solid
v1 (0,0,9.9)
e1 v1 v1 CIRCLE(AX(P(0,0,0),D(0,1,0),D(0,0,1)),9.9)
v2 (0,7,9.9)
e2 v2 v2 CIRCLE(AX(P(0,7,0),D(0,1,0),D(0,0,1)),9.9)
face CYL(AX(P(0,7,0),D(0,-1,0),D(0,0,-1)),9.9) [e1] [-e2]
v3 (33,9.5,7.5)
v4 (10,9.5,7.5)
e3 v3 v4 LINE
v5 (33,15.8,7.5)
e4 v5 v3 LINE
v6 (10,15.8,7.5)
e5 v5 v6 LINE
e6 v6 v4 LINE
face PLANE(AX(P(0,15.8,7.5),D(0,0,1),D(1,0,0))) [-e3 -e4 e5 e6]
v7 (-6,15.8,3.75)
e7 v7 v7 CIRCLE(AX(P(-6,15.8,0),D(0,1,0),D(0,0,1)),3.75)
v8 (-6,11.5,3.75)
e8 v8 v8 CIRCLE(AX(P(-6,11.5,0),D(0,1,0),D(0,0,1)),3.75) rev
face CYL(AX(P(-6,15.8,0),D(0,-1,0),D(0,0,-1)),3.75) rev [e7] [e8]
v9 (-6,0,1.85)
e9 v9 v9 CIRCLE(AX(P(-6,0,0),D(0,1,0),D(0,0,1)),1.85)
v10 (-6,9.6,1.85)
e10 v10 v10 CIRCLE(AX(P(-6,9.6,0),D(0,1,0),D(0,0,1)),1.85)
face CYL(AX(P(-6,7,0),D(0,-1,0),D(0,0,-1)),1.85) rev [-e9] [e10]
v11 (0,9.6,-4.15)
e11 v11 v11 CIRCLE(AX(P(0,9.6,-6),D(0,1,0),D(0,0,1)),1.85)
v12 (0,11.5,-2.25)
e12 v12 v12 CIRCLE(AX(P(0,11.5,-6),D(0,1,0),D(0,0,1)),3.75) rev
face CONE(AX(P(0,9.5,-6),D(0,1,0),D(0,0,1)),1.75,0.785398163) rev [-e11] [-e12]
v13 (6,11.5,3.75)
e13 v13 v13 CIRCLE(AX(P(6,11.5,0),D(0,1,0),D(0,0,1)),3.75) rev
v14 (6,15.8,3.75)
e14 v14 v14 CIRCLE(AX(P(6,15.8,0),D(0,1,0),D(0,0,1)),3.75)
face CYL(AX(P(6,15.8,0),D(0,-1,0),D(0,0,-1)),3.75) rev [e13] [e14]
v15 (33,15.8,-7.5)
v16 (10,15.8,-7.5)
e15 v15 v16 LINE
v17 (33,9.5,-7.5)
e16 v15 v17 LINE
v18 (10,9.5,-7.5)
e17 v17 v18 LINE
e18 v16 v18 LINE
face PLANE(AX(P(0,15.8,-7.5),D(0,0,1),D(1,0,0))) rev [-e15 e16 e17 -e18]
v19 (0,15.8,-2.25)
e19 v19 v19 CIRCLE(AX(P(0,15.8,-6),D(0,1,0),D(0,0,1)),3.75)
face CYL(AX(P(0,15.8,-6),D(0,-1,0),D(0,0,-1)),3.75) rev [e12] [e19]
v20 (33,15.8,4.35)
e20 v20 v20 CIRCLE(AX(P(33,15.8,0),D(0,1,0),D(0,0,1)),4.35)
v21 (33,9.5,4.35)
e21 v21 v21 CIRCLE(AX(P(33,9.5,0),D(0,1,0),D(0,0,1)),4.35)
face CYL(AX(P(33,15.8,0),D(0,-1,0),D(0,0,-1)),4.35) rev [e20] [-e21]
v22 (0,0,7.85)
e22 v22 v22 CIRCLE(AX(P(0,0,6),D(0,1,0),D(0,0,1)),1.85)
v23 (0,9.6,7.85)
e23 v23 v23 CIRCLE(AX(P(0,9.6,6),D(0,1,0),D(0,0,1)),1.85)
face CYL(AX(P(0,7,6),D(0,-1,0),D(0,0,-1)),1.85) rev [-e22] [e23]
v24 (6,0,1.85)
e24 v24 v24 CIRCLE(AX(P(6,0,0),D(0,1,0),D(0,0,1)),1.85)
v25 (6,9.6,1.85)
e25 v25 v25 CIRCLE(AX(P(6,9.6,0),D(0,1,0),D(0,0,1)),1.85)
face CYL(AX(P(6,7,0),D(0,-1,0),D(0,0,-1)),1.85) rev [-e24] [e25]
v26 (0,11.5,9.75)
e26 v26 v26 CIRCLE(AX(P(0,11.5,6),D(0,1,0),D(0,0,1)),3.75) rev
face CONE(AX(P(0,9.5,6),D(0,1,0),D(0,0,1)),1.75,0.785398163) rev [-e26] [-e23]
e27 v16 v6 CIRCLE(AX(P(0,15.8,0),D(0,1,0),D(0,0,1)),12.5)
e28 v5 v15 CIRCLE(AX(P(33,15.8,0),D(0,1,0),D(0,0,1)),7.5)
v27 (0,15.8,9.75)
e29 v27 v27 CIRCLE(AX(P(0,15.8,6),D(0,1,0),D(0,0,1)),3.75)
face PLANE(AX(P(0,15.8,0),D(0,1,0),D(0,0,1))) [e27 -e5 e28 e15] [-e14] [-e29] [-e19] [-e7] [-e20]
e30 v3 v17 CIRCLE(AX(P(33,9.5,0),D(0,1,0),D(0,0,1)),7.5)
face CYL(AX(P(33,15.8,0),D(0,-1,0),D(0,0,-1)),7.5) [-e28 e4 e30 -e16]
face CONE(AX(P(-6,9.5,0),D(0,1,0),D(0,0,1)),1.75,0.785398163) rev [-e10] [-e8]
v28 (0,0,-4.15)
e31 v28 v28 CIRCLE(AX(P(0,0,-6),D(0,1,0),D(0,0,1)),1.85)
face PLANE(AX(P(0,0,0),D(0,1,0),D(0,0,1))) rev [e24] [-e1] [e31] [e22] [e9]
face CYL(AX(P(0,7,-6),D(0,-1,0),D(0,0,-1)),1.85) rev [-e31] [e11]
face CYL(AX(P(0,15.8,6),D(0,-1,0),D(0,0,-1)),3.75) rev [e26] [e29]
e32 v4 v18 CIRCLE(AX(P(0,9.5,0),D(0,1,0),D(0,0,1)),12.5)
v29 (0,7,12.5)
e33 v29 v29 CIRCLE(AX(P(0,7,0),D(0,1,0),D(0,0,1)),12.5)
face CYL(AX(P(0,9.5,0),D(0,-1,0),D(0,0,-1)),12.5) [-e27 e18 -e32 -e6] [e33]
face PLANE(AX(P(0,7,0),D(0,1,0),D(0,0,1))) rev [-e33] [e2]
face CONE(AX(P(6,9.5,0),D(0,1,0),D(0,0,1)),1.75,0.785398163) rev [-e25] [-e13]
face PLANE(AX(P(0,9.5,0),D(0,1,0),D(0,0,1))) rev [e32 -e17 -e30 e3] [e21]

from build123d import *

# Parameters (mm, degrees)
SKETCH_1_R      = 9.9
SKETCH_1_R_2    = 1.85
EXTRUDE_1_DEPTH = 7
SKETCH_2_R      = 12.5
SKETCH_2_R_2    = 1.85
EXTRUDE_2_DEPTH = 2.5
SKETCH_3_R      = 3.75
EXTRUDE_3_DEPTH = 6.3
CHAMFER_1_SIZE  = 2


with BuildPart() as part:
    # 草图1 → 凸台-拉伸1 (new body)
    with BuildSketch(Plane(origin=(0, 0, 0), x_dir=(1, 0, 0), z_dir=(0, 1, 0))):
        with Locations(Location((0, 0, 0), (0, 0, 270))):
            Circle(SKETCH_1_R)
        with Locations(Location((6, 0, 0), (0, 0, 270))):
            Circle(SKETCH_1_R_2, mode=Mode.SUBTRACT)
        with Locations(Location((0, -6, 0), (0, 0, 270))):
            Circle(SKETCH_1_R_2, mode=Mode.SUBTRACT)
        with Locations(Location((-6, 0, 0), (0, 0, 270))):
            Circle(SKETCH_1_R_2, mode=Mode.SUBTRACT)
        with Locations(Location((0, 6, 0), (0, 0, 270))):
            Circle(SKETCH_1_R_2, mode=Mode.SUBTRACT)
    extrude(amount=EXTRUDE_1_DEPTH)

    # 草图2 → 凸台-拉伸2 (add)
    with BuildSketch(Plane(origin=(0, 7, 0), x_dir=(1, 0, 0), z_dir=(0, 1, 0))):
        with Locations(Location((0, 0, 0), (0, 0, 270))):
            Circle(SKETCH_2_R)
        with Locations(Location((-6, 0, 0), (0, 0, 270))):
            Circle(SKETCH_2_R_2, mode=Mode.SUBTRACT)
        with Locations(Location((0, -6, 0), (0, 0, 270))):
            Circle(SKETCH_2_R_2, mode=Mode.SUBTRACT)
        with Locations(Location((6, 0, 0), (0, 0, 270))):
            Circle(SKETCH_2_R_2, mode=Mode.SUBTRACT)
        with Locations(Location((0, 6, 0), (0, 0, 270))):
            Circle(SKETCH_2_R_2, mode=Mode.SUBTRACT)
    extrude(amount=EXTRUDE_2_DEPTH)

    # 草图3 → 凸台-拉伸3 (add)
    # profile 1 of 8: a face of its own
    with BuildSketch(Plane(origin=(0, 9.5, 0), x_dir=(1, 0, 0), z_dir=(0, 1, 0))):
        with BuildLine():
            Line((2.25, 0), (-2.25, 0))
            ThreePointArc((-2.25, 0), (-6, -3.75), (-9.75, 0))
            Line((-9.75, 0), (-12.5, 0))
            ThreePointArc((-12.5, 0), (-3.952847075, -11.858541226), (10, -7.5))
            ThreePointArc((10, -7.5), (11.858541226, -3.952847075), (12.5, 0))
            Line((12.5, 0), (9.75, 0))
            ThreePointArc((9.75, 0), (6, -3.75), (2.25, 0))
        make_face()
        with Locations(Location((0, -6, 0), (0, 0, 270))):
            Circle(SKETCH_3_R, mode=Mode.SUBTRACT)
    # profile 2 of 8: a face of its own
    with BuildSketch(Plane(origin=(0, 9.5, 0), x_dir=(1, 0, 0), z_dir=(0, 1, 0))):
        with BuildLine():
            ThreePointArc((-9.75, 0), (-6, 3.75), (-2.25, 0))
            Line((-2.25, 0), (2.25, 0))
            ThreePointArc((2.25, 0), (6, 3.75), (9.75, 0))
            Line((9.75, 0), (12.5, 0))
            ThreePointArc((12.5, 0), (11.858541226, 3.952847075), (10, 7.5))
            ThreePointArc((10, 7.5), (-3.952847075, 11.858541226), (-12.5, 0))
            Line((-12.5, 0), (-9.75, 0))
        make_face()
        with Locations(Location((0, 6, 0), (0, 0, 270))):
            Circle(SKETCH_3_R, mode=Mode.SUBTRACT)
    # profile 3 of 8: a face of its own
    with BuildSketch(Plane(origin=(0, 9.5, 0), x_dir=(1, 0, 0), z_dir=(0, 1, 0))):
        with BuildLine():
            ThreePointArc((10, 7.5), (11.858541226, 3.952847075), (12.5, 0))
            Line((12.5, 0), (25.5, 0))
            ThreePointArc((25.5, 0), (27.696699141, 5.303300859), (33, 7.5))
            Line((33, 7.5), (10, 7.5))
        make_face()
    # profile 4 of 8: a face of its own
    with BuildSketch(Plane(origin=(0, 9.5, 0), x_dir=(1, 0, 0), z_dir=(0, 1, 0))):
        with BuildLine():
            Line((25.5, 0), (12.5, 0))
            ThreePointArc((12.5, 0), (11.858541226, -3.952847075), (10, -7.5))
            Line((10, -7.5), (33, -7.5))
            ThreePointArc((33, -7.5), (27.696699141, -5.303300859), (25.5, 0))
        make_face()
    # profile 5 of 8: a face of its own
    with BuildSketch(Plane(origin=(0, 9.5, 0), x_dir=(1, 0, 0), z_dir=(0, 1, 0))):
        with BuildLine():
            ThreePointArc((33, 7.5), (27.696699141, 5.303300859), (25.5, 0))
            Line((25.5, 0), (28.65, 0))
            ThreePointArc((28.65, 0), (33, 4.35), (37.35, 0))
            Line((37.35, 0), (40.5, 0))
            ThreePointArc((40.5, 0), (38.303300859, 5.303300859), (33, 7.5))
        make_face()
    # profile 6 of 8: a face of its own
    with BuildSketch(Plane(origin=(0, 9.5, 0), x_dir=(1, 0, 0), z_dir=(0, 1, 0))):
        with BuildLine():
            Line((28.65, 0), (25.5, 0))
            ThreePointArc((25.5, 0), (27.696699141, -5.303300859), (33, -7.5))
            ThreePointArc((33, -7.5), (38.303300859, -5.303300859), (40.5, 0))
            Line((40.5, 0), (37.35, 0))
            ThreePointArc((37.35, 0), (33, -4.35), (28.65, 0))
        make_face()
    # profile 7 of 8: a face of its own
    with BuildSketch(Plane(origin=(0, 9.5, 0), x_dir=(1, 0, 0), z_dir=(0, 1, 0))):
        with BuildLine():
            ThreePointArc((33, 7.5), (27.696699141, 5.303300859), (25.5, 0))
            Line((25.5, 0), (28.65, 0))
            ThreePointArc((28.65, 0), (33, 4.35), (37.35, 0))
            Line((37.35, 0), (40.5, 0))
            ThreePointArc((40.5, 0), (38.303300859, 5.303300859), (33, 7.5))
        make_face()
    # profile 8 of 8: a face of its own
    with BuildSketch(Plane(origin=(0, 9.5, 0), x_dir=(1, 0, 0), z_dir=(0, 1, 0))):
        with BuildLine():
            Line((28.65, 0), (25.5, 0))
            ThreePointArc((25.5, 0), (27.696699141, -5.303300859), (33, -7.5))
            ThreePointArc((33, -7.5), (38.303300859, -5.303300859), (40.5, 0))
            Line((40.5, 0), (37.35, 0))
            ThreePointArc((37.35, 0), (33, -4.35), (28.65, 0))
        make_face()
    extrude(amount=EXTRUDE_3_DEPTH)

    # 倒角1
    # the kernel refuses this chamfer: 2 mm, written as the material it adds along each edge
    with BuildSketch(Plane(origin=(0, 9.5, 6), x_dir=(0, 0, 1), z_dir=(-1, 0, 0))) as chamfer_1_piece_1_section:
        Polygon((3.75 - CHAMFER_1_SIZE, 0), (3.75, CHAMFER_1_SIZE), (3.75, 0), align=None)
    chamfer_1_piece_1 = revolve(axis=Axis((0, 9.5, 6), (0, 1, 0)), mode=Mode.PRIVATE)
    chamfer_1_piece_1 = chamfer_1_piece_1 - Plane(origin=(0, 10.553600351, 6), x_dir=(0, 0, 1), z_dir=(0, -1, 0)) * Cylinder(1.85, 15, mode=Mode.PRIVATE)
    add(chamfer_1_piece_1)
    with BuildSketch(Plane(origin=(-6, 9.5, 0), x_dir=(-1, 0, 0), z_dir=(0, 0, 1))) as chamfer_1_piece_2_section:
        Polygon((3.75 - CHAMFER_1_SIZE, 0), (3.75, -CHAMFER_1_SIZE), (3.75, 0), align=None)
    chamfer_1_piece_2 = revolve(axis=Axis((-6, 9.5, 0), (0, -1, 0)), mode=Mode.PRIVATE)
    chamfer_1_piece_2 = chamfer_1_piece_2 - Plane(origin=(-6, 10.553600351, 0), x_dir=(0, 0, 1), z_dir=(0, -1, 0)) * Cylinder(1.85, 15, mode=Mode.PRIVATE)
    add(chamfer_1_piece_2)
    with BuildSketch(Plane(origin=(0, 9.5, -6), x_dir=(0, 0, 1), z_dir=(-1, 0, 0))) as chamfer_1_piece_3_section:
        Polygon((3.75 - CHAMFER_1_SIZE, 0), (3.75, CHAMFER_1_SIZE), (3.75, 0), align=None)
    chamfer_1_piece_3 = revolve(axis=Axis((0, 9.5, -6), (0, 1, 0)), mode=Mode.PRIVATE)
    chamfer_1_piece_3 = chamfer_1_piece_3 - Plane(origin=(0, 10.553600351, -6), x_dir=(0, 0, 1), z_dir=(0, -1, 0)) * Cylinder(1.85, 16, mode=Mode.PRIVATE)
    add(chamfer_1_piece_3)
    with BuildSketch(Plane(origin=(6, 9.5, 0), x_dir=(1, 0, 0), z_dir=(0, 0, -1))) as chamfer_1_piece_4_section:
        Polygon((3.75 - CHAMFER_1_SIZE, 0), (3.75, -CHAMFER_1_SIZE), (3.75, 0), align=None)
    chamfer_1_piece_4 = revolve(axis=Axis((6, 9.5, 0), (0, -1, 0)), mode=Mode.PRIVATE)
    chamfer_1_piece_4 = chamfer_1_piece_4 - Plane(origin=(6, 10.553600351, 0), x_dir=(0, 0, 1), z_dir=(0, -1, 0)) * Cylinder(1.85, 15, mode=Mode.PRIVATE)
    add(chamfer_1_piece_4)


solid = part.part
